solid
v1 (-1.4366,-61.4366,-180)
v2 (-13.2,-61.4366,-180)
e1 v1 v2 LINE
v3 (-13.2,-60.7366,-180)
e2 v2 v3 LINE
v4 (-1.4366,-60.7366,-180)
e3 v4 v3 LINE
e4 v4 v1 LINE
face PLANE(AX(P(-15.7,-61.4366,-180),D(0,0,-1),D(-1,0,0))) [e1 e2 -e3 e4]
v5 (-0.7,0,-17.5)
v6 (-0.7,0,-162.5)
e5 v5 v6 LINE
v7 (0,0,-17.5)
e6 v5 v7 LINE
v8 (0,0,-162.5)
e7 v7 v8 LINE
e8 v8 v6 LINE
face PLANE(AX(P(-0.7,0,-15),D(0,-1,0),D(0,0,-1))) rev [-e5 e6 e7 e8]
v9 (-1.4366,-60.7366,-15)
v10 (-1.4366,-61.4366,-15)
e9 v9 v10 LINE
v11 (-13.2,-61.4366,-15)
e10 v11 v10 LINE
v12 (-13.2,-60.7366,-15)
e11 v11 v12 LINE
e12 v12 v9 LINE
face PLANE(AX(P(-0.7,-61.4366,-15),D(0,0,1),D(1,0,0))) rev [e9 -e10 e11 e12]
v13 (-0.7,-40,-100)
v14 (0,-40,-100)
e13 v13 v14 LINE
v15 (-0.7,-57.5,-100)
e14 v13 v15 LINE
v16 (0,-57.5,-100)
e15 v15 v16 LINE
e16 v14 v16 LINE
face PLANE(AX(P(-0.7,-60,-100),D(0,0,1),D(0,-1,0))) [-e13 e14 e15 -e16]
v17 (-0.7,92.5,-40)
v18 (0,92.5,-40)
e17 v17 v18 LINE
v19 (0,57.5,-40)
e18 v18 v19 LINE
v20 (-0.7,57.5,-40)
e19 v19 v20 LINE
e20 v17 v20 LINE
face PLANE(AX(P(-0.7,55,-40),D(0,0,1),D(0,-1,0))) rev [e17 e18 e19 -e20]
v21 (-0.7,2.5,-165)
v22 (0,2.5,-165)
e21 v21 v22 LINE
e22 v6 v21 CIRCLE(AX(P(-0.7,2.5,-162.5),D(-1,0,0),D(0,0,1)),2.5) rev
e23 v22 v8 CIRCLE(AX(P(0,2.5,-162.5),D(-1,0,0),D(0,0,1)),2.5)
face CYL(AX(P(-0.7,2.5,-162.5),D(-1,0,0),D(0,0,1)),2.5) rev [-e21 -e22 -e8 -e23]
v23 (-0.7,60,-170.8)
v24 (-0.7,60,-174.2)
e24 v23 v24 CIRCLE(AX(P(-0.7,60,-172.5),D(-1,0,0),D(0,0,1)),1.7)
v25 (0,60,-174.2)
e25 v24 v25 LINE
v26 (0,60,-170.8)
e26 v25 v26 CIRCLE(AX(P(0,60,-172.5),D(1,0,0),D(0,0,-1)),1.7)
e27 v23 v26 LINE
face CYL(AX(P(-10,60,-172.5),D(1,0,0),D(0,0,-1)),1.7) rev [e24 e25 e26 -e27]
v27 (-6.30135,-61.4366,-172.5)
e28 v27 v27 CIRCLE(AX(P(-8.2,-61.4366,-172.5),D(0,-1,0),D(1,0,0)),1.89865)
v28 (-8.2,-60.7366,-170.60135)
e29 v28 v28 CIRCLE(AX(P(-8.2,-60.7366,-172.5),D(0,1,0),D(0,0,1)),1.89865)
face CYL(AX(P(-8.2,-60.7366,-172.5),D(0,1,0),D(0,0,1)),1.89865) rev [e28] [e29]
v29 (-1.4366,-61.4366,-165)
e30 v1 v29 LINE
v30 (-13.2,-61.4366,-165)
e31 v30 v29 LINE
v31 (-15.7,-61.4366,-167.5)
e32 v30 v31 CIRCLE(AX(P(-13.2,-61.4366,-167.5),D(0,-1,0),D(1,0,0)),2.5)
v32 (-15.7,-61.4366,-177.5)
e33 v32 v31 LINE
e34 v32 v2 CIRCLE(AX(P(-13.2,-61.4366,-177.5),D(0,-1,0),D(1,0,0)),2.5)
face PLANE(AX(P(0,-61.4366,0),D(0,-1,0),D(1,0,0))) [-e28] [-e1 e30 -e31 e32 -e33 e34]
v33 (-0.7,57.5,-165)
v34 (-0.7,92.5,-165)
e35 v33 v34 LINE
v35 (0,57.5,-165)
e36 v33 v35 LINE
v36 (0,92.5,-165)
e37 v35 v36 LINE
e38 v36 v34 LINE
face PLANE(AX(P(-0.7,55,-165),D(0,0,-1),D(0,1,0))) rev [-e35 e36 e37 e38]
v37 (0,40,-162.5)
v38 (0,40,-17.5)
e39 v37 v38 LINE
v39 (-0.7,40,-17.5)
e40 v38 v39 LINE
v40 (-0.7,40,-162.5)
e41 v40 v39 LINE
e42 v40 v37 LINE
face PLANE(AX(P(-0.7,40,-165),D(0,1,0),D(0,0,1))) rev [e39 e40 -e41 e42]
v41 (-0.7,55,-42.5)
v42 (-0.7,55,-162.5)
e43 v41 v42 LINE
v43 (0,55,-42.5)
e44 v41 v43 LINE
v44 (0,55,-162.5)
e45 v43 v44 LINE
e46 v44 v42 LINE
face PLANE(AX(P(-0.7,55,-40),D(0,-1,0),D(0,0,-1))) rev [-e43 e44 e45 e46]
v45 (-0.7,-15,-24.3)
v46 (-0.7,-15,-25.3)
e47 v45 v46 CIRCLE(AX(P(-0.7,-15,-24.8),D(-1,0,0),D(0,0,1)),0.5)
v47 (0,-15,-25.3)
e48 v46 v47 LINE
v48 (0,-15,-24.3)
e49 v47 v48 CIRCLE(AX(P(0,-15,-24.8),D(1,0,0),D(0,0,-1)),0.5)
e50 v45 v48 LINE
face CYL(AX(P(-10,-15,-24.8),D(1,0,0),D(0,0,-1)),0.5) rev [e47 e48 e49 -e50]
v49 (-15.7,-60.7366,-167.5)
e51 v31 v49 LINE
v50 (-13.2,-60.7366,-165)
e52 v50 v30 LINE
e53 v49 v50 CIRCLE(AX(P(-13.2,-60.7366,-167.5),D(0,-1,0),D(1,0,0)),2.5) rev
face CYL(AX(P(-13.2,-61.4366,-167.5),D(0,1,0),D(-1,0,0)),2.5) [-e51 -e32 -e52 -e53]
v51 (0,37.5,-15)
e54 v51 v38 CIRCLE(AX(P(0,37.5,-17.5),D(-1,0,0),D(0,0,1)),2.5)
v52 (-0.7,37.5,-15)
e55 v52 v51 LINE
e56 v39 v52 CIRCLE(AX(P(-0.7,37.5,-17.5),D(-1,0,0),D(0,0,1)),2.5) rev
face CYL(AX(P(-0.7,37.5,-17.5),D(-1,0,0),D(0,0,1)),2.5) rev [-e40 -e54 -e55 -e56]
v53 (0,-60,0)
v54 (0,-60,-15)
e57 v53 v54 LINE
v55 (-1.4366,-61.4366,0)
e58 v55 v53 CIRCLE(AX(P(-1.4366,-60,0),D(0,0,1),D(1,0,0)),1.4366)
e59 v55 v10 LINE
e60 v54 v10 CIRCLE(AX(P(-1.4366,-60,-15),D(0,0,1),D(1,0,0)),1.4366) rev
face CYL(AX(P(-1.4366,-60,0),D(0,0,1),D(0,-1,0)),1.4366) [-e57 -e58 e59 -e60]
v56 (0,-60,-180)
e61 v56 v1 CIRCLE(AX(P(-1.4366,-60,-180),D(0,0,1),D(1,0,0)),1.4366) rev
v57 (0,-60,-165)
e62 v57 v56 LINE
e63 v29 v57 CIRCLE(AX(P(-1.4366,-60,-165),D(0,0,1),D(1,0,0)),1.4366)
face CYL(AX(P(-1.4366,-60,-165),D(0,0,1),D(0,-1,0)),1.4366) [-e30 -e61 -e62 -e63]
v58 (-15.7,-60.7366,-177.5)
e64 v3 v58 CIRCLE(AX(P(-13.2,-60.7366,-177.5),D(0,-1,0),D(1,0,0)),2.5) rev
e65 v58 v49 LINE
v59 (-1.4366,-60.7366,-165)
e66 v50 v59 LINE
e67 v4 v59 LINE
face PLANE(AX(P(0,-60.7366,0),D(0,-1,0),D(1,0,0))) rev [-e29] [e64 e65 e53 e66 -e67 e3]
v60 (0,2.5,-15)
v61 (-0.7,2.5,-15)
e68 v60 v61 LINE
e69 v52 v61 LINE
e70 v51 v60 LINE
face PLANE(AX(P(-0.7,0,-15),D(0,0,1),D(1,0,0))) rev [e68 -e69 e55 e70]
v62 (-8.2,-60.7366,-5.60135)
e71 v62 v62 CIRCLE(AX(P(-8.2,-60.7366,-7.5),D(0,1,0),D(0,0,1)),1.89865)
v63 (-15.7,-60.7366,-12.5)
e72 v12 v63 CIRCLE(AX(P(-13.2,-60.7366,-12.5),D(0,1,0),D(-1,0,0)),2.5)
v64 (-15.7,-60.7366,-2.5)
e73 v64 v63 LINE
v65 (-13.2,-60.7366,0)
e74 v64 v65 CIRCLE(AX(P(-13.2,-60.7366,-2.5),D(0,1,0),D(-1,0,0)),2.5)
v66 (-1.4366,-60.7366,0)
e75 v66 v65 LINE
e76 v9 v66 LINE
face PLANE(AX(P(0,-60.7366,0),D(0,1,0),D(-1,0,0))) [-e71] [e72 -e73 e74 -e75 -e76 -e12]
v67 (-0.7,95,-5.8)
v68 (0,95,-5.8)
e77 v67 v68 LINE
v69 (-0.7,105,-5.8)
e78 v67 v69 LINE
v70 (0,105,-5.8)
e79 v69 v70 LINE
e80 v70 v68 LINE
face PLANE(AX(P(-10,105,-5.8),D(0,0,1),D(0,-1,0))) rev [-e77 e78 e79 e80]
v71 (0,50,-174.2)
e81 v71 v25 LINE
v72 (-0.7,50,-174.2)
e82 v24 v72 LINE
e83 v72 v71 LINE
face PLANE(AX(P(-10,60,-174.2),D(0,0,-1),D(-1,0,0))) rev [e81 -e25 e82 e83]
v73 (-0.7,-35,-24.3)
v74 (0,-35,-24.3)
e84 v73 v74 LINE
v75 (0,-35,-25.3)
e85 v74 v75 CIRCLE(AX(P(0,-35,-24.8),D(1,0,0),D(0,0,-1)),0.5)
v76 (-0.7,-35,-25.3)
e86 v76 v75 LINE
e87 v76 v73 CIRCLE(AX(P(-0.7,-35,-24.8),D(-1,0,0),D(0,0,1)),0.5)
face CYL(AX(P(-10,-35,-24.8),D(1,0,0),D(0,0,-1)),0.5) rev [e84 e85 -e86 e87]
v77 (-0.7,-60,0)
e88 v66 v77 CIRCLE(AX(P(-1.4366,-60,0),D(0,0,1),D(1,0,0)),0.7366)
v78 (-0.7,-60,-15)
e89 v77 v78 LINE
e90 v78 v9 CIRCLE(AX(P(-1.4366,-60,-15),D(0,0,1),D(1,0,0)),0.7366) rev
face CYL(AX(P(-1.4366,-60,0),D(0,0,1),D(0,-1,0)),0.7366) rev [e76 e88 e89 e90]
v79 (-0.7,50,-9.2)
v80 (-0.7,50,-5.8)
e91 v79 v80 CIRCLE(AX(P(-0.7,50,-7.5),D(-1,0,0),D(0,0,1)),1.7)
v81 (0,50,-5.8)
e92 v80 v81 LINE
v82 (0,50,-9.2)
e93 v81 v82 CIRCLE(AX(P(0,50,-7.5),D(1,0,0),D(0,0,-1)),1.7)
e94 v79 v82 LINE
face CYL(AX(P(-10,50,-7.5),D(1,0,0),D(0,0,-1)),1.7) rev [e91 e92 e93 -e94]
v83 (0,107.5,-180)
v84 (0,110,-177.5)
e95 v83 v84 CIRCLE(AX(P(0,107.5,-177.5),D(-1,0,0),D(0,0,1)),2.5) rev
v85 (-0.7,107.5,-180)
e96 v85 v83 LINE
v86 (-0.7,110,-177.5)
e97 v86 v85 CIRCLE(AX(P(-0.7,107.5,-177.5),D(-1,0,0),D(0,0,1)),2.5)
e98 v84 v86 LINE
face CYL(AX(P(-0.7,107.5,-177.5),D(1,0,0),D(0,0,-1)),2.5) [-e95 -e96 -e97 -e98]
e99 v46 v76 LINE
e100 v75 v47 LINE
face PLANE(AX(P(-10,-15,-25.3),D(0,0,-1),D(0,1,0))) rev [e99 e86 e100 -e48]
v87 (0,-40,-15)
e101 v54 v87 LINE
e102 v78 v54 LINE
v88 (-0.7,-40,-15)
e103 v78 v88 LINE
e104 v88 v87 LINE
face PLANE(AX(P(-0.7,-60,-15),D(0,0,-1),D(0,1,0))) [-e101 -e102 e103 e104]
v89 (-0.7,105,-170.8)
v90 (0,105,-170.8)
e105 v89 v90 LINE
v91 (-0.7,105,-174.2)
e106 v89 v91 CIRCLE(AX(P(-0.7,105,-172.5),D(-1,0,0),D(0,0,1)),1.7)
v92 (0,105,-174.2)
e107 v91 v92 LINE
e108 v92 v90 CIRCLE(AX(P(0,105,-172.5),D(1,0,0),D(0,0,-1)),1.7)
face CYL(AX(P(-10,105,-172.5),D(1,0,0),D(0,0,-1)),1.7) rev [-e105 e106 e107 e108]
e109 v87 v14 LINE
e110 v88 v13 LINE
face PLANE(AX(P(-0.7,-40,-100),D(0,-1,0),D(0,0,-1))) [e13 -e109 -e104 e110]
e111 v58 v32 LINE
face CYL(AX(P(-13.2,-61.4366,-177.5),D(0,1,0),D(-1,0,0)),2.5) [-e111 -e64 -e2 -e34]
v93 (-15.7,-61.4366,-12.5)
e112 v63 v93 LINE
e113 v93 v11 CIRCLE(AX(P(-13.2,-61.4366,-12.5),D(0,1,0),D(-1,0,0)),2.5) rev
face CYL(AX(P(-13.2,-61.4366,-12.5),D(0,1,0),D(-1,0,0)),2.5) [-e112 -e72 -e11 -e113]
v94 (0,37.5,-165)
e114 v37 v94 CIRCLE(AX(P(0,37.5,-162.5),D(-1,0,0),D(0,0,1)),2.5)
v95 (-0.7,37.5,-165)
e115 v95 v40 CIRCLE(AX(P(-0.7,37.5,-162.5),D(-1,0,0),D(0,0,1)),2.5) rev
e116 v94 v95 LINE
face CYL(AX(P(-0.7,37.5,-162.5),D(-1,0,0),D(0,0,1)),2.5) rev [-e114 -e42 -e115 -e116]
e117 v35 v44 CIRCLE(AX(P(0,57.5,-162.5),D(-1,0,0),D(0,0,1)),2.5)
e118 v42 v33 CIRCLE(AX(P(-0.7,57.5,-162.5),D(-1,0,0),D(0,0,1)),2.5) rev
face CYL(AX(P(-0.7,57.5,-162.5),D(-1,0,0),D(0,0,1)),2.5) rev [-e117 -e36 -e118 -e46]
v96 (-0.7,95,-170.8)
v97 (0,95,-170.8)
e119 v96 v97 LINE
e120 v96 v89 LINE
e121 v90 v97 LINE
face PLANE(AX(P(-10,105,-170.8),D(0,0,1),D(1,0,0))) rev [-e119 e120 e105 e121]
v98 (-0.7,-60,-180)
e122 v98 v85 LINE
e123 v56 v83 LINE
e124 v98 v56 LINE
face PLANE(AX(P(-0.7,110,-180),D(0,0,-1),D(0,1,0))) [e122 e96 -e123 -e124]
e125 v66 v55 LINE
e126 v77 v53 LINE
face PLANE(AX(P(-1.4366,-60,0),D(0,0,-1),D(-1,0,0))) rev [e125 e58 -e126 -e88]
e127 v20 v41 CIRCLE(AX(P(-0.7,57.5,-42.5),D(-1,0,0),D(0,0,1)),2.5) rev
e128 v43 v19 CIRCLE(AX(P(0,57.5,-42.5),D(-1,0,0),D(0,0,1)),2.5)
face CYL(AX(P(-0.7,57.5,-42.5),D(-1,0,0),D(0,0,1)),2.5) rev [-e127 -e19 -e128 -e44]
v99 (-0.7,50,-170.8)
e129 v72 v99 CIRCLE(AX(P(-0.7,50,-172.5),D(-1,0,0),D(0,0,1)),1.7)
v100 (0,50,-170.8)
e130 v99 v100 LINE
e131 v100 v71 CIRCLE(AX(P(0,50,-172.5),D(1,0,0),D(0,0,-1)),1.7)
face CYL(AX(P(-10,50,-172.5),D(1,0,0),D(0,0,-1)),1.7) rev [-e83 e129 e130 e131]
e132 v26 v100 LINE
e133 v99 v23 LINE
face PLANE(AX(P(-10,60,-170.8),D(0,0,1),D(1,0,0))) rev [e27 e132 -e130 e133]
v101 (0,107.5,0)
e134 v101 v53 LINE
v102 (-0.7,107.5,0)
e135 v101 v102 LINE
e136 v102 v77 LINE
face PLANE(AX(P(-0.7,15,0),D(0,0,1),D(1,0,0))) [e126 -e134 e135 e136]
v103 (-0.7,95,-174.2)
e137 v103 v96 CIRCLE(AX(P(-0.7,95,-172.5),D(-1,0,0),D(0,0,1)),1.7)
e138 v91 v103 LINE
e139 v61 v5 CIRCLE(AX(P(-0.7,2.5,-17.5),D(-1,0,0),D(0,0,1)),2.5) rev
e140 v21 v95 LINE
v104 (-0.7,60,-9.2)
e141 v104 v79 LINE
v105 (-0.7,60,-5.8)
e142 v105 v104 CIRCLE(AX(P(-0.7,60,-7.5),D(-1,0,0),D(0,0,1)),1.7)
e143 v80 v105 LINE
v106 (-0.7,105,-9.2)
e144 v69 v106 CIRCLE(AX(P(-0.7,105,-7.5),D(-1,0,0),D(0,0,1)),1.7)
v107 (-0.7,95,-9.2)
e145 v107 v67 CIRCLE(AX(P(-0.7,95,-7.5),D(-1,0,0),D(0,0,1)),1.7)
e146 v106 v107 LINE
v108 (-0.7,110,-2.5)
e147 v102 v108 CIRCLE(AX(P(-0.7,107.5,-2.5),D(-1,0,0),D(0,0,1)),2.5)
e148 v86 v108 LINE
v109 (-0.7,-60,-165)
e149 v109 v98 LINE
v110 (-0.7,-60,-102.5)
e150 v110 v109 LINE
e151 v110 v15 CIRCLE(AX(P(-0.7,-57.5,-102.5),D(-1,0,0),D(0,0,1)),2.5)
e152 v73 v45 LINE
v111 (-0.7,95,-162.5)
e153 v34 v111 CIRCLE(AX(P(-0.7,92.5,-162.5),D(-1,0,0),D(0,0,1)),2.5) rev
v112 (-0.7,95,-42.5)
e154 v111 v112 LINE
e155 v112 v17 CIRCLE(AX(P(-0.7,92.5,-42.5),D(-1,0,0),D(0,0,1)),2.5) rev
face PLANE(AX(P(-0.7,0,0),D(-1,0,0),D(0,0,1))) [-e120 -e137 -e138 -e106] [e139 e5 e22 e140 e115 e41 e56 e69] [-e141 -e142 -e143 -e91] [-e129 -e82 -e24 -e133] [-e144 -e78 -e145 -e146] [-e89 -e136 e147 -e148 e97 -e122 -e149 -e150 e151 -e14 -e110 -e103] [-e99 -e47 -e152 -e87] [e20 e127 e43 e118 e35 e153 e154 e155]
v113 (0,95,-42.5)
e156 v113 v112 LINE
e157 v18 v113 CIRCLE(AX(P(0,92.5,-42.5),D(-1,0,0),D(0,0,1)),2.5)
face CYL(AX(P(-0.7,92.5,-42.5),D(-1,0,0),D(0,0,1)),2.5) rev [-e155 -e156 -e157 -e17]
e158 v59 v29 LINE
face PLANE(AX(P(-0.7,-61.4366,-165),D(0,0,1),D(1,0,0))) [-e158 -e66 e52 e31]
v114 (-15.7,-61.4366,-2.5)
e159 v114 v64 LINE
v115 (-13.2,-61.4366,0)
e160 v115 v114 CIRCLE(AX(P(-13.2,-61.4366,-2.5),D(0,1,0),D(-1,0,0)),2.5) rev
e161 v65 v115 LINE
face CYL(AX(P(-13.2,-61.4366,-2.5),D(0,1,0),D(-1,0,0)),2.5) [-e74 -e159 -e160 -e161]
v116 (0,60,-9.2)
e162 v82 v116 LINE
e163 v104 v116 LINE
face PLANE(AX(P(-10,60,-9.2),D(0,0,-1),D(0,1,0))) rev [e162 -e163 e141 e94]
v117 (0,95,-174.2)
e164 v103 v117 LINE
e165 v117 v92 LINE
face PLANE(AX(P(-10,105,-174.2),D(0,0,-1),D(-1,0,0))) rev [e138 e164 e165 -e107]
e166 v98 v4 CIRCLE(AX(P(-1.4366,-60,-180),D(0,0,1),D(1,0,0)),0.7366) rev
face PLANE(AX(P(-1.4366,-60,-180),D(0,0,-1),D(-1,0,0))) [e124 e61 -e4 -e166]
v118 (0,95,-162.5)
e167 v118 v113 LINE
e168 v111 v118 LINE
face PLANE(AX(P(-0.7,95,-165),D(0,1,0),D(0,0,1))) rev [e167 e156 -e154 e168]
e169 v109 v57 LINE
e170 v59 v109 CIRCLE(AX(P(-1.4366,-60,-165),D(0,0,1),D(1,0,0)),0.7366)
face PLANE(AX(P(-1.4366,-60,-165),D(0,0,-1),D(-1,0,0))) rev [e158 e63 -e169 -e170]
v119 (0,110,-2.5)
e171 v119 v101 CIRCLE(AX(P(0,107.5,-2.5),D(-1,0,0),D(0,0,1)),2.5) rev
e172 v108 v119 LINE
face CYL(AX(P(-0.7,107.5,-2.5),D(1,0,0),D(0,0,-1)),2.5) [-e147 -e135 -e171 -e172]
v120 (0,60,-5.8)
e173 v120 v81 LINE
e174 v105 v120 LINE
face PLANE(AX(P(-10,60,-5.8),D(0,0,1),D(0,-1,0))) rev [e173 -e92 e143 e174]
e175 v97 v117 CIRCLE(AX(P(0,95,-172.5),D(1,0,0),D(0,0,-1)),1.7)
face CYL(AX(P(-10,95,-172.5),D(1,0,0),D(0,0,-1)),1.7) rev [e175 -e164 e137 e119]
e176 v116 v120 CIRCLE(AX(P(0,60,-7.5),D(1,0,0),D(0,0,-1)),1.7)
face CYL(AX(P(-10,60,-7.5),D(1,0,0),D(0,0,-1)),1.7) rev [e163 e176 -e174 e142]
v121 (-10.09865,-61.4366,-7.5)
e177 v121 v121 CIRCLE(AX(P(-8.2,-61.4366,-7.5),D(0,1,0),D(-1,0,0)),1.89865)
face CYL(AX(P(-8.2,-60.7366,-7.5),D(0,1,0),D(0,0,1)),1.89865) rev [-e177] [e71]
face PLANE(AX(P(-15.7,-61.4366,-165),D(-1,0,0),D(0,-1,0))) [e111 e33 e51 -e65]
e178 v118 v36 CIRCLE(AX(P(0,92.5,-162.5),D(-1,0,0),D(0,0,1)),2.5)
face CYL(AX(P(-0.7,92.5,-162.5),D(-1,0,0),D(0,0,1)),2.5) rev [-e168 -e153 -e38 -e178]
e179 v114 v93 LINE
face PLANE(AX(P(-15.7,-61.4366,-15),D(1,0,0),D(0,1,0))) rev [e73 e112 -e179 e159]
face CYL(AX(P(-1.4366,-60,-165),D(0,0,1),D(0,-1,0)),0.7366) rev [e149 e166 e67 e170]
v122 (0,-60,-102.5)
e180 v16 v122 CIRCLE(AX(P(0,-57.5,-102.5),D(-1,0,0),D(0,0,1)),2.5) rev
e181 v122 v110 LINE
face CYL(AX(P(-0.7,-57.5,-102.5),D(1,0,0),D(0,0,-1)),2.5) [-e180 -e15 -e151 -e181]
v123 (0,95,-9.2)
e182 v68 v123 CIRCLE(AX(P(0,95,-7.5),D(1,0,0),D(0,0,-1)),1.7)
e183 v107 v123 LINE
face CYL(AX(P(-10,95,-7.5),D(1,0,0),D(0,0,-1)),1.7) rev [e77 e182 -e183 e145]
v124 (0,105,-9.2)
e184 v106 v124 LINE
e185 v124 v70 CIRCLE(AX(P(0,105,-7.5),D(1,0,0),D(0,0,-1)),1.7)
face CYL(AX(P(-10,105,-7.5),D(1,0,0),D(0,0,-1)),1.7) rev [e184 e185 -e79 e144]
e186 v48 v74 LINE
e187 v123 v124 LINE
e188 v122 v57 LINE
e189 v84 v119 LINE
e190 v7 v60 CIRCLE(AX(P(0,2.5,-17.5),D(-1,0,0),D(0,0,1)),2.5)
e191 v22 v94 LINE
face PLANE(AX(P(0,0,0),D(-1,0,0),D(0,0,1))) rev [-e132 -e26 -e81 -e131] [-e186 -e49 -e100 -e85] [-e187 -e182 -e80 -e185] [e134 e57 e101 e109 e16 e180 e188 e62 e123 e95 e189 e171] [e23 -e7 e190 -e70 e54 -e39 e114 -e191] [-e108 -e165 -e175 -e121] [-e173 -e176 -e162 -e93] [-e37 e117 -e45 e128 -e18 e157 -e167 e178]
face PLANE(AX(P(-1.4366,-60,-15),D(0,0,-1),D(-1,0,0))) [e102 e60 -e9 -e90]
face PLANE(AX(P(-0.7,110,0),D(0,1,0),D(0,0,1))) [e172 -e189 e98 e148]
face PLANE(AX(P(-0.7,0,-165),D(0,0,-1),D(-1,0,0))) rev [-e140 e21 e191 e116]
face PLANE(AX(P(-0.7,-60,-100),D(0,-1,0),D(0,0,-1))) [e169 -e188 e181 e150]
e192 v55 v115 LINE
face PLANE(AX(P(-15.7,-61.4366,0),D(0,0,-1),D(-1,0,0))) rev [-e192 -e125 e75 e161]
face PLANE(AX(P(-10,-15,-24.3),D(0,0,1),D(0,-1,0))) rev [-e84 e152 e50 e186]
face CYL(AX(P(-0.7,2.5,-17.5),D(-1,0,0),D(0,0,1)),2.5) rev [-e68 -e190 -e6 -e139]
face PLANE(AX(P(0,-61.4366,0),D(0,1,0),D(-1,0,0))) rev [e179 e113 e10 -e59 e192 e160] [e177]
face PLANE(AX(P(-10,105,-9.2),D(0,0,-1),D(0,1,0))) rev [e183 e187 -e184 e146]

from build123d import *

# Parameters (mm, degrees)
BASE_FLANGE1_START        = -0.7
BASE_FLANGE1_OUTLINE_W    = 150
BASE_FLANGE1_OUTLINE_H    = 40
BASE_FLANGE1_OUTLINE_W_2  = 125
BASE_FLANGE1_DEPTH        = 0.7
CUT_EXTRUDE1_DEPTH        = 10
EDGE_FLANGE3_DEPTH        = 15
EDGE_FLANGE2_DEPTH        = 15
F_6_CLEARANCE_HOLE1_D     = 3.7973
F_6_CLEARANCE_HOLE1_DEPTH = 10
F_6_CLEARANCE_HOLE1_TIP   = 1.140824014
CUT_EXTRUDE2_DEPTH        = 10
BREAK_CORNER1_START       = -61.4366
BREAK_CORNER1_DEPTH       = 0.7
BREAK_CORNER1_START_2     = -0.7
BREAK_CORNER1_2_DEPTH     = 0.7
FILLET1_R                 = 2.5


# Read off the part's stored shape, not the designer's step: Base-Flange1, Break-Corner1
# Sheet-metal steps are written as plain solids
with BuildPart() as part:
    # Base-Flange1 outline → Base-Flange1 (new body)
    with BuildSketch(Plane(origin=(0, 0, 0), x_dir=(0, 0, -1), z_dir=(1, 0, 0)).offset(BASE_FLANGE1_START)):
        Polygon((180, 110), (0, 110), (0, -60), (15, -60), (15, -40), (100, -40), (100, -60), (180, -60), align=None)
        with Locations((90, 20)):
            Rectangle(BASE_FLANGE1_OUTLINE_W, BASE_FLANGE1_OUTLINE_H, mode=Mode.SUBTRACT)
        with Locations((102.5, 75)):
            Rectangle(BASE_FLANGE1_OUTLINE_W_2, BASE_FLANGE1_OUTLINE_H, mode=Mode.SUBTRACT)
    extrude(amount=BASE_FLANGE1_DEPTH)

    # Sketch4 → Cut-Extrude1 (cut)
    with BuildSketch(Plane(origin=(0, 0, 0), x_dir=(0, 0, -1), z_dir=(1, 0, 0))):
        with BuildLine():
            Line((25.3, -15), (25.3, -35))
            ThreePointArc((25.3, -35), (24.8, -35.5), (24.3, -35))
            Line((24.3, -35), (24.3, -15))
            ThreePointArc((24.3, -15), (24.8, -14.5), (25.3, -15))
        make_face()
    extrude(amount=-CUT_EXTRUDE1_DEPTH, mode=Mode.SUBTRACT)

    # Edge-Flange3 section (across the edge) → Edge-Flange3 (add)
    with BuildSketch(Plane(origin=(-0.7, -60.7366, -180), x_dir=(0, 1, 0), z_dir=(0, 0, 1))):
        with BuildLine():
            Line((-0.7, 0.7366), (-0.7, 15))
            Line((-0.7, 15), (0, 15))
            Line((0, 15), (0, 0.7366))
            ThreePointArc((0, 0.7366), (0.215745145, 0.215745145), (0.7366, 0))
            Line((0.7366, 0), (0.7366, -0.7))
            ThreePointArc((0.7366, -0.7), (-0.279229602, -0.279229602), (-0.7, 0.7366))
        make_face()
    extrude(amount=EDGE_FLANGE3_DEPTH)

    # Edge-Flange2 section (across the edge) → Edge-Flange2 (add)
    with BuildSketch(Plane(origin=(-0.7, -60.7366, -15), x_dir=(0, 1, 0), z_dir=(0, 0, 1))):
        with BuildLine():
            Line((-0.7, 0.7366), (-0.7, 15))
            Line((-0.7, 15), (0, 15))
            Line((0, 15), (0, 0.7366))
            ThreePointArc((0, 0.7366), (0.215745145, 0.215745145), (0.7366, 0))
            Line((0.7366, 0), (0.7366, -0.7))
            ThreePointArc((0.7366, -0.7), (-0.279229602, -0.279229602), (-0.7, 0.7366))
        make_face()
    extrude(amount=EDGE_FLANGE2_DEPTH)

    # #6 Clearance Hole1
    with Locations(Plane(origin=(0, -60.7366, 0), x_dir=(1, 0, 0), z_dir=(0, 1, 0))):
        with Locations((-8.2, 7.5), (-8.2, 172.5)):
            Hole(F_6_CLEARANCE_HOLE1_D / 2, depth=F_6_CLEARANCE_HOLE1_DEPTH)
            with Locations((0, 0, -(F_6_CLEARANCE_HOLE1_DEPTH + F_6_CLEARANCE_HOLE1_TIP / 2))):  # 118° drill point
                Cone(0, F_6_CLEARANCE_HOLE1_D / 2, F_6_CLEARANCE_HOLE1_TIP, mode=Mode.SUBTRACT)

    # Sketch13 → Cut-Extrude2 (cut)
    with BuildSketch(Plane(origin=(0, 0, 0), x_dir=(0, 0, -1), z_dir=(1, 0, 0))):
        with BuildLine():
            Line((9.2, 105), (9.2, 95))
            ThreePointArc((9.2, 95), (7.5, 93.3), (5.8, 95))
            Line((5.8, 95), (5.8, 105))
            ThreePointArc((5.8, 105), (7.5, 106.7), (9.2, 105))
        make_face()
        with BuildLine():
            Line((174.2, 105), (174.2, 95))
            ThreePointArc((174.2, 95), (172.5, 93.3), (170.8, 95))
            Line((170.8, 95), (170.8, 105))
            ThreePointArc((170.8, 105), (172.5, 106.7), (174.2, 105))
        make_face()
        with BuildLine():
            Line((9.2, 60), (9.2, 50))
            ThreePointArc((9.2, 50), (7.5, 48.3), (5.8, 50))
            Line((5.8, 50), (5.8, 60))
            ThreePointArc((5.8, 60), (7.5, 61.7), (9.2, 60))
        make_face()
        with BuildLine():
            Line((174.2, 60), (174.2, 50))
            ThreePointArc((174.2, 50), (172.5, 48.3), (170.8, 50))
            Line((170.8, 50), (170.8, 60))
            ThreePointArc((170.8, 60), (172.5, 61.7), (174.2, 60))
        make_face()
    extrude(amount=-CUT_EXTRUDE2_DEPTH, mode=Mode.SUBTRACT)

    # Break-Corner1 outline → Break-Corner1 (cut)
    with BuildSketch(Plane(origin=(0, 0, 0), x_dir=(1, 0, 0), z_dir=(0, 1, 0)).offset(BREAK_CORNER1_START)):
        with BuildLine():
            ThreePointArc((-13.2, 0), (-14.967766953, 0.732233047), (-15.7, 2.5))
            Line((-15.7, 2.5), (-15.7, 0))
            Line((-15.7, 0), (-13.2, 0))
        make_face()
        with BuildLine():
            ThreePointArc((-15.7, 12.5), (-14.967766953, 14.267766953), (-13.2, 15))
            Line((-13.2, 15), (-15.7, 15))
            Line((-15.7, 15), (-15.7, 12.5))
        make_face()
        with BuildLine():
            Line((-15.7, 180), (-15.7, 177.5))
            ThreePointArc((-15.7, 177.5), (-14.967766953, 179.267766953), (-13.2, 180))
            Line((-13.2, 180), (-15.7, 180))
        make_face()
        with BuildLine():
            ThreePointArc((-13.2, 165), (-14.967766953, 165.732233047), (-15.7, 167.5))
            Line((-15.7, 167.5), (-15.7, 165))
            Line((-15.7, 165), (-13.2, 165))
        make_face()
    extrude(amount=BREAK_CORNER1_DEPTH, mode=Mode.SUBTRACT)

    # Break-Corner1 2 outline → Break-Corner1 2 (cut)
    with BuildSketch(Plane.YZ.offset(BREAK_CORNER1_START_2)):
        with BuildLine():
            ThreePointArc((107.5, 0), (109.267766953, -0.732233047), (110, -2.5))
            Line((110, -2.5), (110, 0))
            Line((110, 0), (107.5, 0))
        make_face()
        with BuildLine():
            ThreePointArc((110, -177.5), (109.267766953, -179.267766953), (107.5, -180))
            Line((107.5, -180), (110, -180))
            Line((110, -180), (110, -177.5))
        make_face()
        with BuildLine():
            ThreePointArc((-60, -102.5), (-59.267766953, -100.732233047), (-57.5, -100))
            Line((-57.5, -100), (-60, -100))
            Line((-60, -100), (-60, -102.5))
        make_face()
    extrude(amount=BREAK_CORNER1_2_DEPTH, mode=Mode.SUBTRACT)

    # Fillet1
    fillet1_edges = [part.edges().sort_by_distance(p)[0] for p in [
        (-0.35, 55, -40),
        (-0.35, 95, -40),
        (-0.35, 95, -165),
        (-0.35, 55, -165),
        (-0.35, 40, -165),
        (-0.35, 0, -165),
        (-0.35, 0, -15),
        (-0.35, 40, -15),
    ]]
    fillet(fillet1_edges, radius=FILLET1_R)


solid = part.part
